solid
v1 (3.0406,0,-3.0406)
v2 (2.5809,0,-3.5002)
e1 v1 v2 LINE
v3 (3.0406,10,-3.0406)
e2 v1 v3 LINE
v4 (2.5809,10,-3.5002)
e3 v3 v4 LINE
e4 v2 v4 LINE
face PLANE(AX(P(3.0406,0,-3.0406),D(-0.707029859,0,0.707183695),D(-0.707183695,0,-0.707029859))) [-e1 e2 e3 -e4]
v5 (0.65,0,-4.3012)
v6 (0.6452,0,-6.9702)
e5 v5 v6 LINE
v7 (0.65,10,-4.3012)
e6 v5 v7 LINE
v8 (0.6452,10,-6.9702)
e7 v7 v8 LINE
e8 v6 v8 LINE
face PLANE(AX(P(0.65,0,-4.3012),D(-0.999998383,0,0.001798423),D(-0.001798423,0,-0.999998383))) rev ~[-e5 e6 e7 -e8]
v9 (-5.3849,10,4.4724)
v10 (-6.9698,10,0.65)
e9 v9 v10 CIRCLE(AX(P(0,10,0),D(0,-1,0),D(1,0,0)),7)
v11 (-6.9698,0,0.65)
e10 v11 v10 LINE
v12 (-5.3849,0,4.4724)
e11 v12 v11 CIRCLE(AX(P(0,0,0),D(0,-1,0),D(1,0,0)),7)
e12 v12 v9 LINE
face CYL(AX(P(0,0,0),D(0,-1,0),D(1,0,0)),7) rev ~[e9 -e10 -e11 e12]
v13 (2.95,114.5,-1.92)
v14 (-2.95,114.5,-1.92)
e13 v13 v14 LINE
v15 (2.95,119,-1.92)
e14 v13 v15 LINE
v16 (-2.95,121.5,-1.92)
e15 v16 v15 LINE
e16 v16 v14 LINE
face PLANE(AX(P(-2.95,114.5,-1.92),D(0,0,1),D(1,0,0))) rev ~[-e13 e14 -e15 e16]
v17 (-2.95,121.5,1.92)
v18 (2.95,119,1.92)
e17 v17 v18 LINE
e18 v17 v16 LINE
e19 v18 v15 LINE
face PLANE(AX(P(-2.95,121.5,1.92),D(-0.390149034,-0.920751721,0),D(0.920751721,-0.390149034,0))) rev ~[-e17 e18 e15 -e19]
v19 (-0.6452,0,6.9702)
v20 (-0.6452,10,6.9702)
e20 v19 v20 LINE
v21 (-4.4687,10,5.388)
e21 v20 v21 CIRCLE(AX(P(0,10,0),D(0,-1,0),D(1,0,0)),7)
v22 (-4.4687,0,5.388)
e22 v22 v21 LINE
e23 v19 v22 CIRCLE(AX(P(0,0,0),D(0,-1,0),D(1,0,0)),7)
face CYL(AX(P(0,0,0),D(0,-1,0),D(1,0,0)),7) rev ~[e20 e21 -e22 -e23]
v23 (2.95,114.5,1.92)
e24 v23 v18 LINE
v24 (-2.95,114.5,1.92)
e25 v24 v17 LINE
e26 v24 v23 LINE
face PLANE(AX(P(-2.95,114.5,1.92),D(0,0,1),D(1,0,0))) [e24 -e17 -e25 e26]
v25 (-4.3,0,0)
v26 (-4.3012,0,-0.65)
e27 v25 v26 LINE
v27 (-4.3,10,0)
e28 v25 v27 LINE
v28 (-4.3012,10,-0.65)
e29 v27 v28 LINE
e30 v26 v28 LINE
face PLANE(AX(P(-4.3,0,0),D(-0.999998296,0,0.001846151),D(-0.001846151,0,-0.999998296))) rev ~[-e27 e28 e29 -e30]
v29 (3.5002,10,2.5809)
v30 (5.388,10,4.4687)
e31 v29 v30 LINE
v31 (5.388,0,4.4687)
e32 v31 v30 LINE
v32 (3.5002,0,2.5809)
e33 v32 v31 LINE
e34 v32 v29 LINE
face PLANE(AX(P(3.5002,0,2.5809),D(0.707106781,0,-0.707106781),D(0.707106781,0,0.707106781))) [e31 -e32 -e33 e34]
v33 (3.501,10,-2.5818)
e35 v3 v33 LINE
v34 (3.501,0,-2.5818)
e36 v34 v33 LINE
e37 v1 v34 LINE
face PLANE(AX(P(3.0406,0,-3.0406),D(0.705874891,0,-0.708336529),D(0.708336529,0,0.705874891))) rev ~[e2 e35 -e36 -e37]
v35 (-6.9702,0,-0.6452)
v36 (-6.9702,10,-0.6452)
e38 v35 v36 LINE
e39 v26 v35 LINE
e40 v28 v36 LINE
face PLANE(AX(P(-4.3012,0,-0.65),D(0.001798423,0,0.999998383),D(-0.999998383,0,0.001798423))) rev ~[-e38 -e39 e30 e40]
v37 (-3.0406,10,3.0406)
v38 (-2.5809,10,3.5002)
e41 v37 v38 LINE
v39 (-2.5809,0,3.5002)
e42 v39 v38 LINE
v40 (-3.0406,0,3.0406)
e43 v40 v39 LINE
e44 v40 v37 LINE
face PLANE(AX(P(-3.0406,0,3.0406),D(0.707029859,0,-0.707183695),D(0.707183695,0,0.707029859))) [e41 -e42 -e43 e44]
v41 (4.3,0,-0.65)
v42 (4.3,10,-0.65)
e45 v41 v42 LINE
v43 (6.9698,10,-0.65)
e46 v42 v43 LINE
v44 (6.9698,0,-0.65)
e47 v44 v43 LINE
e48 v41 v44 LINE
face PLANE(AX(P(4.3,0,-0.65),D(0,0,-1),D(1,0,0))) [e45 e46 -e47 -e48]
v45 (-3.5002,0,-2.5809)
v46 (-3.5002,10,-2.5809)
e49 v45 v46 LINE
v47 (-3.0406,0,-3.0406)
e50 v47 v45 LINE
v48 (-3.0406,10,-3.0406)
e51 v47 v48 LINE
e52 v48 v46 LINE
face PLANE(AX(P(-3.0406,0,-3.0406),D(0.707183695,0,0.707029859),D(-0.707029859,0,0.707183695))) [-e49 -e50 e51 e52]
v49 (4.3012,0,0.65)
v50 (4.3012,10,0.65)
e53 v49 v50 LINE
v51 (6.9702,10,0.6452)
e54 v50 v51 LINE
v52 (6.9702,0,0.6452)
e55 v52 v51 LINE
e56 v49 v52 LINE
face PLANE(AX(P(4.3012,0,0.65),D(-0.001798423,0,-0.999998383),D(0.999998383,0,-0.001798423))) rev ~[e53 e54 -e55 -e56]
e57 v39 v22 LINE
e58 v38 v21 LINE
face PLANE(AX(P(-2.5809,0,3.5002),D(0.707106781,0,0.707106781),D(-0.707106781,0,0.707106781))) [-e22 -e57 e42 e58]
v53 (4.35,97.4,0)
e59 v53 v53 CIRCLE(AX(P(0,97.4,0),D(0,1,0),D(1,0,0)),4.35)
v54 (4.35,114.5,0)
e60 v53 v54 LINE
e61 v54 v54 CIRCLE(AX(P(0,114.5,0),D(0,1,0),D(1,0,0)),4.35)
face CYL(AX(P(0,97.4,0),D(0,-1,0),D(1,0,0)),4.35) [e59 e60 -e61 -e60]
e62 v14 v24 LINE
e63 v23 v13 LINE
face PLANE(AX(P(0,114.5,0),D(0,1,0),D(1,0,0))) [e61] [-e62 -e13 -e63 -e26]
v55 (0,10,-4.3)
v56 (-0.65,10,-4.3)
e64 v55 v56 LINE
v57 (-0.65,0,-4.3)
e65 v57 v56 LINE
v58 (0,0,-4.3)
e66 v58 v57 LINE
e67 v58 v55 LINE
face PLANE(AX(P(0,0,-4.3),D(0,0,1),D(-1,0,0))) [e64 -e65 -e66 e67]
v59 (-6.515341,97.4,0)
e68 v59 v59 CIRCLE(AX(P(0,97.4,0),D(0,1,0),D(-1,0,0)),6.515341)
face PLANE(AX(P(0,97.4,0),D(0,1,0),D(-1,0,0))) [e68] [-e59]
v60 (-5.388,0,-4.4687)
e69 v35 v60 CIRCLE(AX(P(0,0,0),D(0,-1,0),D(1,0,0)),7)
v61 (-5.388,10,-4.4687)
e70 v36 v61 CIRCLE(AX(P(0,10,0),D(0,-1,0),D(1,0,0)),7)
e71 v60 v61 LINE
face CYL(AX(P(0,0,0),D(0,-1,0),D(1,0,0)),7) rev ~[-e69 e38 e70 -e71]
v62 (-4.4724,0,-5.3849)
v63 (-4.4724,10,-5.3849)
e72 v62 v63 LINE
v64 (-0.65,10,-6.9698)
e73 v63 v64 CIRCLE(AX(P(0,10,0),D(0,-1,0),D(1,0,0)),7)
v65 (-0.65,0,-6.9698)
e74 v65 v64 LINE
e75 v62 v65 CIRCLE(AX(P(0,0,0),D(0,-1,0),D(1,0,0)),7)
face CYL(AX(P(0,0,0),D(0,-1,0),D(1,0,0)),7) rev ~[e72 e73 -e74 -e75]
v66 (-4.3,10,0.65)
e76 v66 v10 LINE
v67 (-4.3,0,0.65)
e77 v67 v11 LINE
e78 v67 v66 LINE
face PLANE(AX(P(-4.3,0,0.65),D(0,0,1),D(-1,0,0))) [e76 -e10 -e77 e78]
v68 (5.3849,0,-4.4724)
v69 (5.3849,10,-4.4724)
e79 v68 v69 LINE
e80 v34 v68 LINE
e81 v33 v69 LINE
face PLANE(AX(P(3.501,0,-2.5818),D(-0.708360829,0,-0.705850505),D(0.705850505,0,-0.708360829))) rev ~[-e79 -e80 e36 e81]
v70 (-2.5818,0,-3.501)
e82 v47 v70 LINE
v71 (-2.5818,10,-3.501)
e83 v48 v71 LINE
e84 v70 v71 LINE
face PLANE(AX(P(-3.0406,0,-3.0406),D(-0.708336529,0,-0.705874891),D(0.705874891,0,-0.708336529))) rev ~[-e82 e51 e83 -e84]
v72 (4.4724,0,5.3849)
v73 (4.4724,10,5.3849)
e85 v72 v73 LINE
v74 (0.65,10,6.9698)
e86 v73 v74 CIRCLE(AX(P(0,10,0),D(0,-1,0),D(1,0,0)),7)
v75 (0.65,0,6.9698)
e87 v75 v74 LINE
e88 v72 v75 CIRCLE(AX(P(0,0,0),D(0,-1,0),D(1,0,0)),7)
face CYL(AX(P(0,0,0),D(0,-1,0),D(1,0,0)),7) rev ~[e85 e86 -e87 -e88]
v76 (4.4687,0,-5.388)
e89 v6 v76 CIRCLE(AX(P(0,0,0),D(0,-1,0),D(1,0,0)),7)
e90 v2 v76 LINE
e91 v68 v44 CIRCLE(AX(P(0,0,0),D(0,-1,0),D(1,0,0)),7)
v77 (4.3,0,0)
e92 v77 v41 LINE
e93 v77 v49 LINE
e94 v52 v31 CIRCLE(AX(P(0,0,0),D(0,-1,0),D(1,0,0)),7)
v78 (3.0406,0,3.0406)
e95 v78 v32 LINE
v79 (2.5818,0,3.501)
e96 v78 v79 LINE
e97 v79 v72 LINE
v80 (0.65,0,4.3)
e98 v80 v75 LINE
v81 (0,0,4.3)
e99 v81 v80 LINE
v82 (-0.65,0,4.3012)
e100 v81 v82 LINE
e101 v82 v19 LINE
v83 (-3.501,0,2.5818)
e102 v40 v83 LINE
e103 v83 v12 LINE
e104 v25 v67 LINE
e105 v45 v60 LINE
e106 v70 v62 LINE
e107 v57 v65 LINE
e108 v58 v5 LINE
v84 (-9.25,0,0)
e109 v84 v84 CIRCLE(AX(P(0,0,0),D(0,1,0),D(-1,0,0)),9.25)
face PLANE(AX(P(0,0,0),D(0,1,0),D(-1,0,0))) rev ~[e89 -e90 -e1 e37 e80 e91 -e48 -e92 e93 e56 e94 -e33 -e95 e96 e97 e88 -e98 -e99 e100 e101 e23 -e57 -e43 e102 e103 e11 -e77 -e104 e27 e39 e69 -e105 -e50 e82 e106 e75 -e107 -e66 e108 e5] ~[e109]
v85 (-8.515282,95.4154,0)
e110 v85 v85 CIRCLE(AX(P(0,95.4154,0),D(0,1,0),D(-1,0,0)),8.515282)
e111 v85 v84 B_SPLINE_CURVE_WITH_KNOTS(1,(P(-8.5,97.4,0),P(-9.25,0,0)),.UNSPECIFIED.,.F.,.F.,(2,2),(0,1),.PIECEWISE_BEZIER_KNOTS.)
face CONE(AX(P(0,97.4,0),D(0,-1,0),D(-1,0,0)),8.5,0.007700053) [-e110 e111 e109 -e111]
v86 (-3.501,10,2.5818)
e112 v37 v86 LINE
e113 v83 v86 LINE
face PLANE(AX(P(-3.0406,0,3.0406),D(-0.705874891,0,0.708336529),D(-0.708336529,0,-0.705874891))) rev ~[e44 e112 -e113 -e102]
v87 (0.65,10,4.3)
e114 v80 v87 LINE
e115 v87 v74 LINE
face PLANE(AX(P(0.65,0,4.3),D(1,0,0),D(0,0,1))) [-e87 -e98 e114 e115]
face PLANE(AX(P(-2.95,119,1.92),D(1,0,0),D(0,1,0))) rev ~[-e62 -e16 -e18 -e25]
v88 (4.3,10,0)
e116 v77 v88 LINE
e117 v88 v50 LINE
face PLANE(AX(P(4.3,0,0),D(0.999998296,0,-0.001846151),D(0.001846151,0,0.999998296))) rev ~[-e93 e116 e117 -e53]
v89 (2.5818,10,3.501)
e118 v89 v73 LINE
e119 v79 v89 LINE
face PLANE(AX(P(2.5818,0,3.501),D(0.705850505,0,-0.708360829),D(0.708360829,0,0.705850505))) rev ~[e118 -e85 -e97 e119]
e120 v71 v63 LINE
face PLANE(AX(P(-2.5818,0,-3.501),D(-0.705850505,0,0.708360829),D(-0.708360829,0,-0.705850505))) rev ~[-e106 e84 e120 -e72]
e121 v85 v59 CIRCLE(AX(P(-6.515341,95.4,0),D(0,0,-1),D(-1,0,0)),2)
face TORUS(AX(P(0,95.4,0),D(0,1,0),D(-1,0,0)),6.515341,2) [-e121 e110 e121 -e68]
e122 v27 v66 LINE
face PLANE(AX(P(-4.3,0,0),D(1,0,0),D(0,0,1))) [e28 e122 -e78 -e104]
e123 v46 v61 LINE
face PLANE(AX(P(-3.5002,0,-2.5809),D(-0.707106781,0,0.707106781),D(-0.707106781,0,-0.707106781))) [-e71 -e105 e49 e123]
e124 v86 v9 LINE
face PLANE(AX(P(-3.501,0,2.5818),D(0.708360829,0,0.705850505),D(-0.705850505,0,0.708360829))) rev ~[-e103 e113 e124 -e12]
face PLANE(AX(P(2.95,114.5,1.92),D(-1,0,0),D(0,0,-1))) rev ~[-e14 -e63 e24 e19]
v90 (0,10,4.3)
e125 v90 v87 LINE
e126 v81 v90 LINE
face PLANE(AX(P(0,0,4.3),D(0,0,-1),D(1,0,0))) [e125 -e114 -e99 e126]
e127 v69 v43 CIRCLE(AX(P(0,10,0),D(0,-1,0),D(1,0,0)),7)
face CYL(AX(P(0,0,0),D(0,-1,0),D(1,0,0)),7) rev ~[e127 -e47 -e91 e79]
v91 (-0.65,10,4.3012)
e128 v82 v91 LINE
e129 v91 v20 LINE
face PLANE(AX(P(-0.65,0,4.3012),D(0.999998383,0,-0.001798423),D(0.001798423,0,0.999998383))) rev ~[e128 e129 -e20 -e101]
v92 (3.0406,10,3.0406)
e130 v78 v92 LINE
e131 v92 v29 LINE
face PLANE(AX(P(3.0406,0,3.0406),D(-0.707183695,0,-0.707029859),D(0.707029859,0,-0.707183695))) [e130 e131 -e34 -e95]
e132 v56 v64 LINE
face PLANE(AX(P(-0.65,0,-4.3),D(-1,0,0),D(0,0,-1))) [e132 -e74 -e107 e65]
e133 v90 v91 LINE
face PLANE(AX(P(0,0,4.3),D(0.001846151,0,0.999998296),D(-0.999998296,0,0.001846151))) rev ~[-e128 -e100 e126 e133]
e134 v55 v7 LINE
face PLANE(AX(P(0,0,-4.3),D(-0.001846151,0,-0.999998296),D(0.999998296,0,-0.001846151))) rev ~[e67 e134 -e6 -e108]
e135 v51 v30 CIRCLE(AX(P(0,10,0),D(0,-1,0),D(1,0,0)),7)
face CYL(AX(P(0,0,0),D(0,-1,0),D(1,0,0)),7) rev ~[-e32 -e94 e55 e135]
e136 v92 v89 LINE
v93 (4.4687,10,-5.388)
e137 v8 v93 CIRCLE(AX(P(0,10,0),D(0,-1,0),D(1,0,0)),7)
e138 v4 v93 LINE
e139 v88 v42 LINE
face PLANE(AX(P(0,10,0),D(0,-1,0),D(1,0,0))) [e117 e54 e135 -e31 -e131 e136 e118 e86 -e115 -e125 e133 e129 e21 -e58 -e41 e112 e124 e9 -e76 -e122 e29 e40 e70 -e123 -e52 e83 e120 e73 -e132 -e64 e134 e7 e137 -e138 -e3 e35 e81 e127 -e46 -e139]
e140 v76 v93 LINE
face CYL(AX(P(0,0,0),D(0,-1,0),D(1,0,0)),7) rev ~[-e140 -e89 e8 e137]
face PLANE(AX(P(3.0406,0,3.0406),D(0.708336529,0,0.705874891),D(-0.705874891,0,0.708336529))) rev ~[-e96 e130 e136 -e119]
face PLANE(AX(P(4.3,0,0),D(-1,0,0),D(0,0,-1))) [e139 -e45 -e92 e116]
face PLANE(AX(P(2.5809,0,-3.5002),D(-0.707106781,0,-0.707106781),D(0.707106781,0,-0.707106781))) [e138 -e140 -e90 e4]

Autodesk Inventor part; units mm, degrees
ref_plane "YZ Plane" through (0, 0, 0) normal (1, 0, 0) x (0, 1, 0)
ref_plane "XY Plane" through (0, 0, 0) normal (0, 0, 1) x (1, 0, 0)
sketch "Boceto1" plane through (0, 0, 0) normal (0, 1, 0) x (-1, 0, 0)
  circle A0 centre (0, 0) radius 9.25
  dimension "d0" = 18.5
ref_plane "Plano de trabajo1" through (0, 97.4, 0) normal (0, 1, 0) x (-1, 0, 0)
sketch "Boceto2" plane through (0, 97.4, 0) normal (0, 1, 0) x (-1, 0, 0)
  circle A0 centre (0, 0) radius 8.5
  dimension "d2" = 17
loft "Solevación1" add profiles "Boceto2", "Boceto1"
sketch "Boceto3" plane through (0, 97.4, 0) normal (0, 1, 0) x (1, 0, 0)
  circle A0 centre (0, 0) radius 8.5 projected
  circle A1 centre (0, 0) radius 4.35
  dimension "d7" = 8.7
extrude "Extrusión1" add sketch "Boceto3" along normal blind 17.1 contours A1
fillet "Empalme1" radius 2 1 edges at (8.5, 97.4, 0)
sketch "Boceto4" plane through (0, 114.5, 0) normal (0, 1, 0) x (1, 0, 0)
  line L0 (-2.95, -1.92) -> (2.95, -1.92)
  line L1 (2.95, -1.92) -> (2.95, 1.92)
  line L2 (2.95, 1.92) -> (-2.95, 1.92)
  line L3 (-2.95, 1.92) -> (-2.95, -1.92)
  line L4 (-2.95, -1.92) -> (2.95, 1.92) construction
  line L5 (2.95, -1.92) -> (-2.95, 1.92) construction
  point P0 (0, 0)
  dimension "d11" = 5.9
  dimension "d12" = 3.84
extrude "Extrusión2" add sketch "Boceto4" along normal blind 4.5
sketch "Boceto5" plane through (-2.95, 114.5, 1.92) normal (0, 0, 1) x (1, 0, 0)
  line L0 (5.9, 4.5) -> (0, 4.5) projected
  line L1 (0, 4.5) -> (0, 7)
  line L2 (5.9, 0) -> (5.9, 4.5) projected
  line L3 (0, 7) -> (5.9, 4.5)
  line L4 (5.9, 4.5) -> (0, 4.5)
  point P0 (2.95, -114.5)
  dimension "d15" = 2.5
extrude "Extrusión3" add sketch "Boceto5" against normal up to surface (3.84 mm away)
sketch "Boceto6" plane through (0, 0, 0) normal (0, -1, 0) x (1, 0, 0)
  circle A0 centre (0, 0) radius 7
  line L0 (0, -7) -> (0, -4.3)
  line L1 (0, -4.3) -> (0.65, -4.3012)
  circle A1 centre (0, 0) radius 4.35 projected
  line L2 (0.65, -4.3012) -> (0.6452, -6.9702)
  line L3 (0, -4.3) -> (-0.65, -4.3)
  line L4 (0, -4.3) -> (0.65, -4.3) construction
  line L5 (-0.65, -4.3) -> (-0.65, -6.9698)
  line L6 (-2.5818, -3.501) -> (-4.4724, -5.3849)
  line L7 (-3.0406, -3.0406) -> (-2.5809, -3.5002) construction
  line L8 (-3.0406, -3.0406) -> (-3.5002, -2.5809)
  line L9 (-3.5002, -2.5809) -> (-5.388, -4.4687)
  line L10 (-3.0406, -3.0406) -> (-2.5818, -3.501)
  line L11 (-4.3012, -0.65) -> (-6.9702, -0.6452)
  line L12 (-4.3, 0) -> (-4.3, -0.65) construction
  line L13 (-4.3, 0) -> (-4.3, 0.65)
  line L14 (-4.3, 0.65) -> (-6.9698, 0.65)
  line L15 (-4.3, 0) -> (-4.3012, -0.65)
  line L16 (-3.501, 2.5818) -> (-5.3849, 4.4724)
  line L17 (-3.0406, 3.0406) -> (-3.5002, 2.5809) construction
  line L18 (-3.0406, 3.0406) -> (-2.5809, 3.5002)
  line L19 (-2.5809, 3.5002) -> (-4.4687, 5.388)
  line L20 (-3.0406, 3.0406) -> (-3.501, 2.5818)
  line L21 (-0.65, 4.3012) -> (-0.6452, 6.9702)
  line L22 (0, 4.3) -> (-0.65, 4.3) construction
  line L23 (0, 4.3) -> (0.65, 4.3)
  line L24 (0.65, 4.3) -> (0.65, 6.9698)
  line L25 (0, 4.3) -> (-0.65, 4.3012)
  line L26 (2.5818, 3.501) -> (4.4724, 5.3849)
  line L27 (3.0406, 3.0406) -> (2.5809, 3.5002) construction
  line L28 (3.0406, 3.0406) -> (3.5002, 2.5809)
  line L29 (3.5002, 2.5809) -> (5.388, 4.4687)
  line L30 (3.0406, 3.0406) -> (2.5818, 3.501)
  line L31 (4.3012, 0.65) -> (6.9702, 0.6452)
  line L32 (4.3, 0) -> (4.3, 0.65) construction
  line L33 (4.3, 0) -> (4.3, -0.65)
  line L34 (4.3, -0.65) -> (6.9698, -0.65)
  line L35 (4.3, 0) -> (4.3012, 0.65)
  line L36 (3.501, -2.5818) -> (5.3849, -4.4724)
  line L37 (3.0406, -3.0406) -> (3.5002, -2.5809) construction
  line L38 (3.0406, -3.0406) -> (2.5809, -3.5002)
  line L39 (2.5809, -3.5002) -> (4.4687, -5.388)
  line L40 (3.0406, -3.0406) -> (3.501, -2.5818)
  dimension "d18" = 14
  dimension "d19" = 2.7
  dimension "d20" = 0.65
  dimension "d21" = 90
  dimension "d22" = 0.65
  dimension "d23" = 180
  dimension "d24" = 90
  dimension "d27" = 360
extrude "Extrusión4" cut sketch "Boceto6" against normal blind 10 contours L31 A1 L29 A0 | A0 L36 A1 L34 | L35 L33 A1 L40 L38 L1 L3 L10 L8 L15 L13 L20 L18 L25 L23 L30 L28 | L26 A1 L24 A0 | A0 L2 A1 L39 | L21 A1 L19 A0 | A0 L6 A1 L5 | L16 A1 L14 A0 | A0 L11 A1 L9
properties part number "Marcador" material "Madera (arce)"
